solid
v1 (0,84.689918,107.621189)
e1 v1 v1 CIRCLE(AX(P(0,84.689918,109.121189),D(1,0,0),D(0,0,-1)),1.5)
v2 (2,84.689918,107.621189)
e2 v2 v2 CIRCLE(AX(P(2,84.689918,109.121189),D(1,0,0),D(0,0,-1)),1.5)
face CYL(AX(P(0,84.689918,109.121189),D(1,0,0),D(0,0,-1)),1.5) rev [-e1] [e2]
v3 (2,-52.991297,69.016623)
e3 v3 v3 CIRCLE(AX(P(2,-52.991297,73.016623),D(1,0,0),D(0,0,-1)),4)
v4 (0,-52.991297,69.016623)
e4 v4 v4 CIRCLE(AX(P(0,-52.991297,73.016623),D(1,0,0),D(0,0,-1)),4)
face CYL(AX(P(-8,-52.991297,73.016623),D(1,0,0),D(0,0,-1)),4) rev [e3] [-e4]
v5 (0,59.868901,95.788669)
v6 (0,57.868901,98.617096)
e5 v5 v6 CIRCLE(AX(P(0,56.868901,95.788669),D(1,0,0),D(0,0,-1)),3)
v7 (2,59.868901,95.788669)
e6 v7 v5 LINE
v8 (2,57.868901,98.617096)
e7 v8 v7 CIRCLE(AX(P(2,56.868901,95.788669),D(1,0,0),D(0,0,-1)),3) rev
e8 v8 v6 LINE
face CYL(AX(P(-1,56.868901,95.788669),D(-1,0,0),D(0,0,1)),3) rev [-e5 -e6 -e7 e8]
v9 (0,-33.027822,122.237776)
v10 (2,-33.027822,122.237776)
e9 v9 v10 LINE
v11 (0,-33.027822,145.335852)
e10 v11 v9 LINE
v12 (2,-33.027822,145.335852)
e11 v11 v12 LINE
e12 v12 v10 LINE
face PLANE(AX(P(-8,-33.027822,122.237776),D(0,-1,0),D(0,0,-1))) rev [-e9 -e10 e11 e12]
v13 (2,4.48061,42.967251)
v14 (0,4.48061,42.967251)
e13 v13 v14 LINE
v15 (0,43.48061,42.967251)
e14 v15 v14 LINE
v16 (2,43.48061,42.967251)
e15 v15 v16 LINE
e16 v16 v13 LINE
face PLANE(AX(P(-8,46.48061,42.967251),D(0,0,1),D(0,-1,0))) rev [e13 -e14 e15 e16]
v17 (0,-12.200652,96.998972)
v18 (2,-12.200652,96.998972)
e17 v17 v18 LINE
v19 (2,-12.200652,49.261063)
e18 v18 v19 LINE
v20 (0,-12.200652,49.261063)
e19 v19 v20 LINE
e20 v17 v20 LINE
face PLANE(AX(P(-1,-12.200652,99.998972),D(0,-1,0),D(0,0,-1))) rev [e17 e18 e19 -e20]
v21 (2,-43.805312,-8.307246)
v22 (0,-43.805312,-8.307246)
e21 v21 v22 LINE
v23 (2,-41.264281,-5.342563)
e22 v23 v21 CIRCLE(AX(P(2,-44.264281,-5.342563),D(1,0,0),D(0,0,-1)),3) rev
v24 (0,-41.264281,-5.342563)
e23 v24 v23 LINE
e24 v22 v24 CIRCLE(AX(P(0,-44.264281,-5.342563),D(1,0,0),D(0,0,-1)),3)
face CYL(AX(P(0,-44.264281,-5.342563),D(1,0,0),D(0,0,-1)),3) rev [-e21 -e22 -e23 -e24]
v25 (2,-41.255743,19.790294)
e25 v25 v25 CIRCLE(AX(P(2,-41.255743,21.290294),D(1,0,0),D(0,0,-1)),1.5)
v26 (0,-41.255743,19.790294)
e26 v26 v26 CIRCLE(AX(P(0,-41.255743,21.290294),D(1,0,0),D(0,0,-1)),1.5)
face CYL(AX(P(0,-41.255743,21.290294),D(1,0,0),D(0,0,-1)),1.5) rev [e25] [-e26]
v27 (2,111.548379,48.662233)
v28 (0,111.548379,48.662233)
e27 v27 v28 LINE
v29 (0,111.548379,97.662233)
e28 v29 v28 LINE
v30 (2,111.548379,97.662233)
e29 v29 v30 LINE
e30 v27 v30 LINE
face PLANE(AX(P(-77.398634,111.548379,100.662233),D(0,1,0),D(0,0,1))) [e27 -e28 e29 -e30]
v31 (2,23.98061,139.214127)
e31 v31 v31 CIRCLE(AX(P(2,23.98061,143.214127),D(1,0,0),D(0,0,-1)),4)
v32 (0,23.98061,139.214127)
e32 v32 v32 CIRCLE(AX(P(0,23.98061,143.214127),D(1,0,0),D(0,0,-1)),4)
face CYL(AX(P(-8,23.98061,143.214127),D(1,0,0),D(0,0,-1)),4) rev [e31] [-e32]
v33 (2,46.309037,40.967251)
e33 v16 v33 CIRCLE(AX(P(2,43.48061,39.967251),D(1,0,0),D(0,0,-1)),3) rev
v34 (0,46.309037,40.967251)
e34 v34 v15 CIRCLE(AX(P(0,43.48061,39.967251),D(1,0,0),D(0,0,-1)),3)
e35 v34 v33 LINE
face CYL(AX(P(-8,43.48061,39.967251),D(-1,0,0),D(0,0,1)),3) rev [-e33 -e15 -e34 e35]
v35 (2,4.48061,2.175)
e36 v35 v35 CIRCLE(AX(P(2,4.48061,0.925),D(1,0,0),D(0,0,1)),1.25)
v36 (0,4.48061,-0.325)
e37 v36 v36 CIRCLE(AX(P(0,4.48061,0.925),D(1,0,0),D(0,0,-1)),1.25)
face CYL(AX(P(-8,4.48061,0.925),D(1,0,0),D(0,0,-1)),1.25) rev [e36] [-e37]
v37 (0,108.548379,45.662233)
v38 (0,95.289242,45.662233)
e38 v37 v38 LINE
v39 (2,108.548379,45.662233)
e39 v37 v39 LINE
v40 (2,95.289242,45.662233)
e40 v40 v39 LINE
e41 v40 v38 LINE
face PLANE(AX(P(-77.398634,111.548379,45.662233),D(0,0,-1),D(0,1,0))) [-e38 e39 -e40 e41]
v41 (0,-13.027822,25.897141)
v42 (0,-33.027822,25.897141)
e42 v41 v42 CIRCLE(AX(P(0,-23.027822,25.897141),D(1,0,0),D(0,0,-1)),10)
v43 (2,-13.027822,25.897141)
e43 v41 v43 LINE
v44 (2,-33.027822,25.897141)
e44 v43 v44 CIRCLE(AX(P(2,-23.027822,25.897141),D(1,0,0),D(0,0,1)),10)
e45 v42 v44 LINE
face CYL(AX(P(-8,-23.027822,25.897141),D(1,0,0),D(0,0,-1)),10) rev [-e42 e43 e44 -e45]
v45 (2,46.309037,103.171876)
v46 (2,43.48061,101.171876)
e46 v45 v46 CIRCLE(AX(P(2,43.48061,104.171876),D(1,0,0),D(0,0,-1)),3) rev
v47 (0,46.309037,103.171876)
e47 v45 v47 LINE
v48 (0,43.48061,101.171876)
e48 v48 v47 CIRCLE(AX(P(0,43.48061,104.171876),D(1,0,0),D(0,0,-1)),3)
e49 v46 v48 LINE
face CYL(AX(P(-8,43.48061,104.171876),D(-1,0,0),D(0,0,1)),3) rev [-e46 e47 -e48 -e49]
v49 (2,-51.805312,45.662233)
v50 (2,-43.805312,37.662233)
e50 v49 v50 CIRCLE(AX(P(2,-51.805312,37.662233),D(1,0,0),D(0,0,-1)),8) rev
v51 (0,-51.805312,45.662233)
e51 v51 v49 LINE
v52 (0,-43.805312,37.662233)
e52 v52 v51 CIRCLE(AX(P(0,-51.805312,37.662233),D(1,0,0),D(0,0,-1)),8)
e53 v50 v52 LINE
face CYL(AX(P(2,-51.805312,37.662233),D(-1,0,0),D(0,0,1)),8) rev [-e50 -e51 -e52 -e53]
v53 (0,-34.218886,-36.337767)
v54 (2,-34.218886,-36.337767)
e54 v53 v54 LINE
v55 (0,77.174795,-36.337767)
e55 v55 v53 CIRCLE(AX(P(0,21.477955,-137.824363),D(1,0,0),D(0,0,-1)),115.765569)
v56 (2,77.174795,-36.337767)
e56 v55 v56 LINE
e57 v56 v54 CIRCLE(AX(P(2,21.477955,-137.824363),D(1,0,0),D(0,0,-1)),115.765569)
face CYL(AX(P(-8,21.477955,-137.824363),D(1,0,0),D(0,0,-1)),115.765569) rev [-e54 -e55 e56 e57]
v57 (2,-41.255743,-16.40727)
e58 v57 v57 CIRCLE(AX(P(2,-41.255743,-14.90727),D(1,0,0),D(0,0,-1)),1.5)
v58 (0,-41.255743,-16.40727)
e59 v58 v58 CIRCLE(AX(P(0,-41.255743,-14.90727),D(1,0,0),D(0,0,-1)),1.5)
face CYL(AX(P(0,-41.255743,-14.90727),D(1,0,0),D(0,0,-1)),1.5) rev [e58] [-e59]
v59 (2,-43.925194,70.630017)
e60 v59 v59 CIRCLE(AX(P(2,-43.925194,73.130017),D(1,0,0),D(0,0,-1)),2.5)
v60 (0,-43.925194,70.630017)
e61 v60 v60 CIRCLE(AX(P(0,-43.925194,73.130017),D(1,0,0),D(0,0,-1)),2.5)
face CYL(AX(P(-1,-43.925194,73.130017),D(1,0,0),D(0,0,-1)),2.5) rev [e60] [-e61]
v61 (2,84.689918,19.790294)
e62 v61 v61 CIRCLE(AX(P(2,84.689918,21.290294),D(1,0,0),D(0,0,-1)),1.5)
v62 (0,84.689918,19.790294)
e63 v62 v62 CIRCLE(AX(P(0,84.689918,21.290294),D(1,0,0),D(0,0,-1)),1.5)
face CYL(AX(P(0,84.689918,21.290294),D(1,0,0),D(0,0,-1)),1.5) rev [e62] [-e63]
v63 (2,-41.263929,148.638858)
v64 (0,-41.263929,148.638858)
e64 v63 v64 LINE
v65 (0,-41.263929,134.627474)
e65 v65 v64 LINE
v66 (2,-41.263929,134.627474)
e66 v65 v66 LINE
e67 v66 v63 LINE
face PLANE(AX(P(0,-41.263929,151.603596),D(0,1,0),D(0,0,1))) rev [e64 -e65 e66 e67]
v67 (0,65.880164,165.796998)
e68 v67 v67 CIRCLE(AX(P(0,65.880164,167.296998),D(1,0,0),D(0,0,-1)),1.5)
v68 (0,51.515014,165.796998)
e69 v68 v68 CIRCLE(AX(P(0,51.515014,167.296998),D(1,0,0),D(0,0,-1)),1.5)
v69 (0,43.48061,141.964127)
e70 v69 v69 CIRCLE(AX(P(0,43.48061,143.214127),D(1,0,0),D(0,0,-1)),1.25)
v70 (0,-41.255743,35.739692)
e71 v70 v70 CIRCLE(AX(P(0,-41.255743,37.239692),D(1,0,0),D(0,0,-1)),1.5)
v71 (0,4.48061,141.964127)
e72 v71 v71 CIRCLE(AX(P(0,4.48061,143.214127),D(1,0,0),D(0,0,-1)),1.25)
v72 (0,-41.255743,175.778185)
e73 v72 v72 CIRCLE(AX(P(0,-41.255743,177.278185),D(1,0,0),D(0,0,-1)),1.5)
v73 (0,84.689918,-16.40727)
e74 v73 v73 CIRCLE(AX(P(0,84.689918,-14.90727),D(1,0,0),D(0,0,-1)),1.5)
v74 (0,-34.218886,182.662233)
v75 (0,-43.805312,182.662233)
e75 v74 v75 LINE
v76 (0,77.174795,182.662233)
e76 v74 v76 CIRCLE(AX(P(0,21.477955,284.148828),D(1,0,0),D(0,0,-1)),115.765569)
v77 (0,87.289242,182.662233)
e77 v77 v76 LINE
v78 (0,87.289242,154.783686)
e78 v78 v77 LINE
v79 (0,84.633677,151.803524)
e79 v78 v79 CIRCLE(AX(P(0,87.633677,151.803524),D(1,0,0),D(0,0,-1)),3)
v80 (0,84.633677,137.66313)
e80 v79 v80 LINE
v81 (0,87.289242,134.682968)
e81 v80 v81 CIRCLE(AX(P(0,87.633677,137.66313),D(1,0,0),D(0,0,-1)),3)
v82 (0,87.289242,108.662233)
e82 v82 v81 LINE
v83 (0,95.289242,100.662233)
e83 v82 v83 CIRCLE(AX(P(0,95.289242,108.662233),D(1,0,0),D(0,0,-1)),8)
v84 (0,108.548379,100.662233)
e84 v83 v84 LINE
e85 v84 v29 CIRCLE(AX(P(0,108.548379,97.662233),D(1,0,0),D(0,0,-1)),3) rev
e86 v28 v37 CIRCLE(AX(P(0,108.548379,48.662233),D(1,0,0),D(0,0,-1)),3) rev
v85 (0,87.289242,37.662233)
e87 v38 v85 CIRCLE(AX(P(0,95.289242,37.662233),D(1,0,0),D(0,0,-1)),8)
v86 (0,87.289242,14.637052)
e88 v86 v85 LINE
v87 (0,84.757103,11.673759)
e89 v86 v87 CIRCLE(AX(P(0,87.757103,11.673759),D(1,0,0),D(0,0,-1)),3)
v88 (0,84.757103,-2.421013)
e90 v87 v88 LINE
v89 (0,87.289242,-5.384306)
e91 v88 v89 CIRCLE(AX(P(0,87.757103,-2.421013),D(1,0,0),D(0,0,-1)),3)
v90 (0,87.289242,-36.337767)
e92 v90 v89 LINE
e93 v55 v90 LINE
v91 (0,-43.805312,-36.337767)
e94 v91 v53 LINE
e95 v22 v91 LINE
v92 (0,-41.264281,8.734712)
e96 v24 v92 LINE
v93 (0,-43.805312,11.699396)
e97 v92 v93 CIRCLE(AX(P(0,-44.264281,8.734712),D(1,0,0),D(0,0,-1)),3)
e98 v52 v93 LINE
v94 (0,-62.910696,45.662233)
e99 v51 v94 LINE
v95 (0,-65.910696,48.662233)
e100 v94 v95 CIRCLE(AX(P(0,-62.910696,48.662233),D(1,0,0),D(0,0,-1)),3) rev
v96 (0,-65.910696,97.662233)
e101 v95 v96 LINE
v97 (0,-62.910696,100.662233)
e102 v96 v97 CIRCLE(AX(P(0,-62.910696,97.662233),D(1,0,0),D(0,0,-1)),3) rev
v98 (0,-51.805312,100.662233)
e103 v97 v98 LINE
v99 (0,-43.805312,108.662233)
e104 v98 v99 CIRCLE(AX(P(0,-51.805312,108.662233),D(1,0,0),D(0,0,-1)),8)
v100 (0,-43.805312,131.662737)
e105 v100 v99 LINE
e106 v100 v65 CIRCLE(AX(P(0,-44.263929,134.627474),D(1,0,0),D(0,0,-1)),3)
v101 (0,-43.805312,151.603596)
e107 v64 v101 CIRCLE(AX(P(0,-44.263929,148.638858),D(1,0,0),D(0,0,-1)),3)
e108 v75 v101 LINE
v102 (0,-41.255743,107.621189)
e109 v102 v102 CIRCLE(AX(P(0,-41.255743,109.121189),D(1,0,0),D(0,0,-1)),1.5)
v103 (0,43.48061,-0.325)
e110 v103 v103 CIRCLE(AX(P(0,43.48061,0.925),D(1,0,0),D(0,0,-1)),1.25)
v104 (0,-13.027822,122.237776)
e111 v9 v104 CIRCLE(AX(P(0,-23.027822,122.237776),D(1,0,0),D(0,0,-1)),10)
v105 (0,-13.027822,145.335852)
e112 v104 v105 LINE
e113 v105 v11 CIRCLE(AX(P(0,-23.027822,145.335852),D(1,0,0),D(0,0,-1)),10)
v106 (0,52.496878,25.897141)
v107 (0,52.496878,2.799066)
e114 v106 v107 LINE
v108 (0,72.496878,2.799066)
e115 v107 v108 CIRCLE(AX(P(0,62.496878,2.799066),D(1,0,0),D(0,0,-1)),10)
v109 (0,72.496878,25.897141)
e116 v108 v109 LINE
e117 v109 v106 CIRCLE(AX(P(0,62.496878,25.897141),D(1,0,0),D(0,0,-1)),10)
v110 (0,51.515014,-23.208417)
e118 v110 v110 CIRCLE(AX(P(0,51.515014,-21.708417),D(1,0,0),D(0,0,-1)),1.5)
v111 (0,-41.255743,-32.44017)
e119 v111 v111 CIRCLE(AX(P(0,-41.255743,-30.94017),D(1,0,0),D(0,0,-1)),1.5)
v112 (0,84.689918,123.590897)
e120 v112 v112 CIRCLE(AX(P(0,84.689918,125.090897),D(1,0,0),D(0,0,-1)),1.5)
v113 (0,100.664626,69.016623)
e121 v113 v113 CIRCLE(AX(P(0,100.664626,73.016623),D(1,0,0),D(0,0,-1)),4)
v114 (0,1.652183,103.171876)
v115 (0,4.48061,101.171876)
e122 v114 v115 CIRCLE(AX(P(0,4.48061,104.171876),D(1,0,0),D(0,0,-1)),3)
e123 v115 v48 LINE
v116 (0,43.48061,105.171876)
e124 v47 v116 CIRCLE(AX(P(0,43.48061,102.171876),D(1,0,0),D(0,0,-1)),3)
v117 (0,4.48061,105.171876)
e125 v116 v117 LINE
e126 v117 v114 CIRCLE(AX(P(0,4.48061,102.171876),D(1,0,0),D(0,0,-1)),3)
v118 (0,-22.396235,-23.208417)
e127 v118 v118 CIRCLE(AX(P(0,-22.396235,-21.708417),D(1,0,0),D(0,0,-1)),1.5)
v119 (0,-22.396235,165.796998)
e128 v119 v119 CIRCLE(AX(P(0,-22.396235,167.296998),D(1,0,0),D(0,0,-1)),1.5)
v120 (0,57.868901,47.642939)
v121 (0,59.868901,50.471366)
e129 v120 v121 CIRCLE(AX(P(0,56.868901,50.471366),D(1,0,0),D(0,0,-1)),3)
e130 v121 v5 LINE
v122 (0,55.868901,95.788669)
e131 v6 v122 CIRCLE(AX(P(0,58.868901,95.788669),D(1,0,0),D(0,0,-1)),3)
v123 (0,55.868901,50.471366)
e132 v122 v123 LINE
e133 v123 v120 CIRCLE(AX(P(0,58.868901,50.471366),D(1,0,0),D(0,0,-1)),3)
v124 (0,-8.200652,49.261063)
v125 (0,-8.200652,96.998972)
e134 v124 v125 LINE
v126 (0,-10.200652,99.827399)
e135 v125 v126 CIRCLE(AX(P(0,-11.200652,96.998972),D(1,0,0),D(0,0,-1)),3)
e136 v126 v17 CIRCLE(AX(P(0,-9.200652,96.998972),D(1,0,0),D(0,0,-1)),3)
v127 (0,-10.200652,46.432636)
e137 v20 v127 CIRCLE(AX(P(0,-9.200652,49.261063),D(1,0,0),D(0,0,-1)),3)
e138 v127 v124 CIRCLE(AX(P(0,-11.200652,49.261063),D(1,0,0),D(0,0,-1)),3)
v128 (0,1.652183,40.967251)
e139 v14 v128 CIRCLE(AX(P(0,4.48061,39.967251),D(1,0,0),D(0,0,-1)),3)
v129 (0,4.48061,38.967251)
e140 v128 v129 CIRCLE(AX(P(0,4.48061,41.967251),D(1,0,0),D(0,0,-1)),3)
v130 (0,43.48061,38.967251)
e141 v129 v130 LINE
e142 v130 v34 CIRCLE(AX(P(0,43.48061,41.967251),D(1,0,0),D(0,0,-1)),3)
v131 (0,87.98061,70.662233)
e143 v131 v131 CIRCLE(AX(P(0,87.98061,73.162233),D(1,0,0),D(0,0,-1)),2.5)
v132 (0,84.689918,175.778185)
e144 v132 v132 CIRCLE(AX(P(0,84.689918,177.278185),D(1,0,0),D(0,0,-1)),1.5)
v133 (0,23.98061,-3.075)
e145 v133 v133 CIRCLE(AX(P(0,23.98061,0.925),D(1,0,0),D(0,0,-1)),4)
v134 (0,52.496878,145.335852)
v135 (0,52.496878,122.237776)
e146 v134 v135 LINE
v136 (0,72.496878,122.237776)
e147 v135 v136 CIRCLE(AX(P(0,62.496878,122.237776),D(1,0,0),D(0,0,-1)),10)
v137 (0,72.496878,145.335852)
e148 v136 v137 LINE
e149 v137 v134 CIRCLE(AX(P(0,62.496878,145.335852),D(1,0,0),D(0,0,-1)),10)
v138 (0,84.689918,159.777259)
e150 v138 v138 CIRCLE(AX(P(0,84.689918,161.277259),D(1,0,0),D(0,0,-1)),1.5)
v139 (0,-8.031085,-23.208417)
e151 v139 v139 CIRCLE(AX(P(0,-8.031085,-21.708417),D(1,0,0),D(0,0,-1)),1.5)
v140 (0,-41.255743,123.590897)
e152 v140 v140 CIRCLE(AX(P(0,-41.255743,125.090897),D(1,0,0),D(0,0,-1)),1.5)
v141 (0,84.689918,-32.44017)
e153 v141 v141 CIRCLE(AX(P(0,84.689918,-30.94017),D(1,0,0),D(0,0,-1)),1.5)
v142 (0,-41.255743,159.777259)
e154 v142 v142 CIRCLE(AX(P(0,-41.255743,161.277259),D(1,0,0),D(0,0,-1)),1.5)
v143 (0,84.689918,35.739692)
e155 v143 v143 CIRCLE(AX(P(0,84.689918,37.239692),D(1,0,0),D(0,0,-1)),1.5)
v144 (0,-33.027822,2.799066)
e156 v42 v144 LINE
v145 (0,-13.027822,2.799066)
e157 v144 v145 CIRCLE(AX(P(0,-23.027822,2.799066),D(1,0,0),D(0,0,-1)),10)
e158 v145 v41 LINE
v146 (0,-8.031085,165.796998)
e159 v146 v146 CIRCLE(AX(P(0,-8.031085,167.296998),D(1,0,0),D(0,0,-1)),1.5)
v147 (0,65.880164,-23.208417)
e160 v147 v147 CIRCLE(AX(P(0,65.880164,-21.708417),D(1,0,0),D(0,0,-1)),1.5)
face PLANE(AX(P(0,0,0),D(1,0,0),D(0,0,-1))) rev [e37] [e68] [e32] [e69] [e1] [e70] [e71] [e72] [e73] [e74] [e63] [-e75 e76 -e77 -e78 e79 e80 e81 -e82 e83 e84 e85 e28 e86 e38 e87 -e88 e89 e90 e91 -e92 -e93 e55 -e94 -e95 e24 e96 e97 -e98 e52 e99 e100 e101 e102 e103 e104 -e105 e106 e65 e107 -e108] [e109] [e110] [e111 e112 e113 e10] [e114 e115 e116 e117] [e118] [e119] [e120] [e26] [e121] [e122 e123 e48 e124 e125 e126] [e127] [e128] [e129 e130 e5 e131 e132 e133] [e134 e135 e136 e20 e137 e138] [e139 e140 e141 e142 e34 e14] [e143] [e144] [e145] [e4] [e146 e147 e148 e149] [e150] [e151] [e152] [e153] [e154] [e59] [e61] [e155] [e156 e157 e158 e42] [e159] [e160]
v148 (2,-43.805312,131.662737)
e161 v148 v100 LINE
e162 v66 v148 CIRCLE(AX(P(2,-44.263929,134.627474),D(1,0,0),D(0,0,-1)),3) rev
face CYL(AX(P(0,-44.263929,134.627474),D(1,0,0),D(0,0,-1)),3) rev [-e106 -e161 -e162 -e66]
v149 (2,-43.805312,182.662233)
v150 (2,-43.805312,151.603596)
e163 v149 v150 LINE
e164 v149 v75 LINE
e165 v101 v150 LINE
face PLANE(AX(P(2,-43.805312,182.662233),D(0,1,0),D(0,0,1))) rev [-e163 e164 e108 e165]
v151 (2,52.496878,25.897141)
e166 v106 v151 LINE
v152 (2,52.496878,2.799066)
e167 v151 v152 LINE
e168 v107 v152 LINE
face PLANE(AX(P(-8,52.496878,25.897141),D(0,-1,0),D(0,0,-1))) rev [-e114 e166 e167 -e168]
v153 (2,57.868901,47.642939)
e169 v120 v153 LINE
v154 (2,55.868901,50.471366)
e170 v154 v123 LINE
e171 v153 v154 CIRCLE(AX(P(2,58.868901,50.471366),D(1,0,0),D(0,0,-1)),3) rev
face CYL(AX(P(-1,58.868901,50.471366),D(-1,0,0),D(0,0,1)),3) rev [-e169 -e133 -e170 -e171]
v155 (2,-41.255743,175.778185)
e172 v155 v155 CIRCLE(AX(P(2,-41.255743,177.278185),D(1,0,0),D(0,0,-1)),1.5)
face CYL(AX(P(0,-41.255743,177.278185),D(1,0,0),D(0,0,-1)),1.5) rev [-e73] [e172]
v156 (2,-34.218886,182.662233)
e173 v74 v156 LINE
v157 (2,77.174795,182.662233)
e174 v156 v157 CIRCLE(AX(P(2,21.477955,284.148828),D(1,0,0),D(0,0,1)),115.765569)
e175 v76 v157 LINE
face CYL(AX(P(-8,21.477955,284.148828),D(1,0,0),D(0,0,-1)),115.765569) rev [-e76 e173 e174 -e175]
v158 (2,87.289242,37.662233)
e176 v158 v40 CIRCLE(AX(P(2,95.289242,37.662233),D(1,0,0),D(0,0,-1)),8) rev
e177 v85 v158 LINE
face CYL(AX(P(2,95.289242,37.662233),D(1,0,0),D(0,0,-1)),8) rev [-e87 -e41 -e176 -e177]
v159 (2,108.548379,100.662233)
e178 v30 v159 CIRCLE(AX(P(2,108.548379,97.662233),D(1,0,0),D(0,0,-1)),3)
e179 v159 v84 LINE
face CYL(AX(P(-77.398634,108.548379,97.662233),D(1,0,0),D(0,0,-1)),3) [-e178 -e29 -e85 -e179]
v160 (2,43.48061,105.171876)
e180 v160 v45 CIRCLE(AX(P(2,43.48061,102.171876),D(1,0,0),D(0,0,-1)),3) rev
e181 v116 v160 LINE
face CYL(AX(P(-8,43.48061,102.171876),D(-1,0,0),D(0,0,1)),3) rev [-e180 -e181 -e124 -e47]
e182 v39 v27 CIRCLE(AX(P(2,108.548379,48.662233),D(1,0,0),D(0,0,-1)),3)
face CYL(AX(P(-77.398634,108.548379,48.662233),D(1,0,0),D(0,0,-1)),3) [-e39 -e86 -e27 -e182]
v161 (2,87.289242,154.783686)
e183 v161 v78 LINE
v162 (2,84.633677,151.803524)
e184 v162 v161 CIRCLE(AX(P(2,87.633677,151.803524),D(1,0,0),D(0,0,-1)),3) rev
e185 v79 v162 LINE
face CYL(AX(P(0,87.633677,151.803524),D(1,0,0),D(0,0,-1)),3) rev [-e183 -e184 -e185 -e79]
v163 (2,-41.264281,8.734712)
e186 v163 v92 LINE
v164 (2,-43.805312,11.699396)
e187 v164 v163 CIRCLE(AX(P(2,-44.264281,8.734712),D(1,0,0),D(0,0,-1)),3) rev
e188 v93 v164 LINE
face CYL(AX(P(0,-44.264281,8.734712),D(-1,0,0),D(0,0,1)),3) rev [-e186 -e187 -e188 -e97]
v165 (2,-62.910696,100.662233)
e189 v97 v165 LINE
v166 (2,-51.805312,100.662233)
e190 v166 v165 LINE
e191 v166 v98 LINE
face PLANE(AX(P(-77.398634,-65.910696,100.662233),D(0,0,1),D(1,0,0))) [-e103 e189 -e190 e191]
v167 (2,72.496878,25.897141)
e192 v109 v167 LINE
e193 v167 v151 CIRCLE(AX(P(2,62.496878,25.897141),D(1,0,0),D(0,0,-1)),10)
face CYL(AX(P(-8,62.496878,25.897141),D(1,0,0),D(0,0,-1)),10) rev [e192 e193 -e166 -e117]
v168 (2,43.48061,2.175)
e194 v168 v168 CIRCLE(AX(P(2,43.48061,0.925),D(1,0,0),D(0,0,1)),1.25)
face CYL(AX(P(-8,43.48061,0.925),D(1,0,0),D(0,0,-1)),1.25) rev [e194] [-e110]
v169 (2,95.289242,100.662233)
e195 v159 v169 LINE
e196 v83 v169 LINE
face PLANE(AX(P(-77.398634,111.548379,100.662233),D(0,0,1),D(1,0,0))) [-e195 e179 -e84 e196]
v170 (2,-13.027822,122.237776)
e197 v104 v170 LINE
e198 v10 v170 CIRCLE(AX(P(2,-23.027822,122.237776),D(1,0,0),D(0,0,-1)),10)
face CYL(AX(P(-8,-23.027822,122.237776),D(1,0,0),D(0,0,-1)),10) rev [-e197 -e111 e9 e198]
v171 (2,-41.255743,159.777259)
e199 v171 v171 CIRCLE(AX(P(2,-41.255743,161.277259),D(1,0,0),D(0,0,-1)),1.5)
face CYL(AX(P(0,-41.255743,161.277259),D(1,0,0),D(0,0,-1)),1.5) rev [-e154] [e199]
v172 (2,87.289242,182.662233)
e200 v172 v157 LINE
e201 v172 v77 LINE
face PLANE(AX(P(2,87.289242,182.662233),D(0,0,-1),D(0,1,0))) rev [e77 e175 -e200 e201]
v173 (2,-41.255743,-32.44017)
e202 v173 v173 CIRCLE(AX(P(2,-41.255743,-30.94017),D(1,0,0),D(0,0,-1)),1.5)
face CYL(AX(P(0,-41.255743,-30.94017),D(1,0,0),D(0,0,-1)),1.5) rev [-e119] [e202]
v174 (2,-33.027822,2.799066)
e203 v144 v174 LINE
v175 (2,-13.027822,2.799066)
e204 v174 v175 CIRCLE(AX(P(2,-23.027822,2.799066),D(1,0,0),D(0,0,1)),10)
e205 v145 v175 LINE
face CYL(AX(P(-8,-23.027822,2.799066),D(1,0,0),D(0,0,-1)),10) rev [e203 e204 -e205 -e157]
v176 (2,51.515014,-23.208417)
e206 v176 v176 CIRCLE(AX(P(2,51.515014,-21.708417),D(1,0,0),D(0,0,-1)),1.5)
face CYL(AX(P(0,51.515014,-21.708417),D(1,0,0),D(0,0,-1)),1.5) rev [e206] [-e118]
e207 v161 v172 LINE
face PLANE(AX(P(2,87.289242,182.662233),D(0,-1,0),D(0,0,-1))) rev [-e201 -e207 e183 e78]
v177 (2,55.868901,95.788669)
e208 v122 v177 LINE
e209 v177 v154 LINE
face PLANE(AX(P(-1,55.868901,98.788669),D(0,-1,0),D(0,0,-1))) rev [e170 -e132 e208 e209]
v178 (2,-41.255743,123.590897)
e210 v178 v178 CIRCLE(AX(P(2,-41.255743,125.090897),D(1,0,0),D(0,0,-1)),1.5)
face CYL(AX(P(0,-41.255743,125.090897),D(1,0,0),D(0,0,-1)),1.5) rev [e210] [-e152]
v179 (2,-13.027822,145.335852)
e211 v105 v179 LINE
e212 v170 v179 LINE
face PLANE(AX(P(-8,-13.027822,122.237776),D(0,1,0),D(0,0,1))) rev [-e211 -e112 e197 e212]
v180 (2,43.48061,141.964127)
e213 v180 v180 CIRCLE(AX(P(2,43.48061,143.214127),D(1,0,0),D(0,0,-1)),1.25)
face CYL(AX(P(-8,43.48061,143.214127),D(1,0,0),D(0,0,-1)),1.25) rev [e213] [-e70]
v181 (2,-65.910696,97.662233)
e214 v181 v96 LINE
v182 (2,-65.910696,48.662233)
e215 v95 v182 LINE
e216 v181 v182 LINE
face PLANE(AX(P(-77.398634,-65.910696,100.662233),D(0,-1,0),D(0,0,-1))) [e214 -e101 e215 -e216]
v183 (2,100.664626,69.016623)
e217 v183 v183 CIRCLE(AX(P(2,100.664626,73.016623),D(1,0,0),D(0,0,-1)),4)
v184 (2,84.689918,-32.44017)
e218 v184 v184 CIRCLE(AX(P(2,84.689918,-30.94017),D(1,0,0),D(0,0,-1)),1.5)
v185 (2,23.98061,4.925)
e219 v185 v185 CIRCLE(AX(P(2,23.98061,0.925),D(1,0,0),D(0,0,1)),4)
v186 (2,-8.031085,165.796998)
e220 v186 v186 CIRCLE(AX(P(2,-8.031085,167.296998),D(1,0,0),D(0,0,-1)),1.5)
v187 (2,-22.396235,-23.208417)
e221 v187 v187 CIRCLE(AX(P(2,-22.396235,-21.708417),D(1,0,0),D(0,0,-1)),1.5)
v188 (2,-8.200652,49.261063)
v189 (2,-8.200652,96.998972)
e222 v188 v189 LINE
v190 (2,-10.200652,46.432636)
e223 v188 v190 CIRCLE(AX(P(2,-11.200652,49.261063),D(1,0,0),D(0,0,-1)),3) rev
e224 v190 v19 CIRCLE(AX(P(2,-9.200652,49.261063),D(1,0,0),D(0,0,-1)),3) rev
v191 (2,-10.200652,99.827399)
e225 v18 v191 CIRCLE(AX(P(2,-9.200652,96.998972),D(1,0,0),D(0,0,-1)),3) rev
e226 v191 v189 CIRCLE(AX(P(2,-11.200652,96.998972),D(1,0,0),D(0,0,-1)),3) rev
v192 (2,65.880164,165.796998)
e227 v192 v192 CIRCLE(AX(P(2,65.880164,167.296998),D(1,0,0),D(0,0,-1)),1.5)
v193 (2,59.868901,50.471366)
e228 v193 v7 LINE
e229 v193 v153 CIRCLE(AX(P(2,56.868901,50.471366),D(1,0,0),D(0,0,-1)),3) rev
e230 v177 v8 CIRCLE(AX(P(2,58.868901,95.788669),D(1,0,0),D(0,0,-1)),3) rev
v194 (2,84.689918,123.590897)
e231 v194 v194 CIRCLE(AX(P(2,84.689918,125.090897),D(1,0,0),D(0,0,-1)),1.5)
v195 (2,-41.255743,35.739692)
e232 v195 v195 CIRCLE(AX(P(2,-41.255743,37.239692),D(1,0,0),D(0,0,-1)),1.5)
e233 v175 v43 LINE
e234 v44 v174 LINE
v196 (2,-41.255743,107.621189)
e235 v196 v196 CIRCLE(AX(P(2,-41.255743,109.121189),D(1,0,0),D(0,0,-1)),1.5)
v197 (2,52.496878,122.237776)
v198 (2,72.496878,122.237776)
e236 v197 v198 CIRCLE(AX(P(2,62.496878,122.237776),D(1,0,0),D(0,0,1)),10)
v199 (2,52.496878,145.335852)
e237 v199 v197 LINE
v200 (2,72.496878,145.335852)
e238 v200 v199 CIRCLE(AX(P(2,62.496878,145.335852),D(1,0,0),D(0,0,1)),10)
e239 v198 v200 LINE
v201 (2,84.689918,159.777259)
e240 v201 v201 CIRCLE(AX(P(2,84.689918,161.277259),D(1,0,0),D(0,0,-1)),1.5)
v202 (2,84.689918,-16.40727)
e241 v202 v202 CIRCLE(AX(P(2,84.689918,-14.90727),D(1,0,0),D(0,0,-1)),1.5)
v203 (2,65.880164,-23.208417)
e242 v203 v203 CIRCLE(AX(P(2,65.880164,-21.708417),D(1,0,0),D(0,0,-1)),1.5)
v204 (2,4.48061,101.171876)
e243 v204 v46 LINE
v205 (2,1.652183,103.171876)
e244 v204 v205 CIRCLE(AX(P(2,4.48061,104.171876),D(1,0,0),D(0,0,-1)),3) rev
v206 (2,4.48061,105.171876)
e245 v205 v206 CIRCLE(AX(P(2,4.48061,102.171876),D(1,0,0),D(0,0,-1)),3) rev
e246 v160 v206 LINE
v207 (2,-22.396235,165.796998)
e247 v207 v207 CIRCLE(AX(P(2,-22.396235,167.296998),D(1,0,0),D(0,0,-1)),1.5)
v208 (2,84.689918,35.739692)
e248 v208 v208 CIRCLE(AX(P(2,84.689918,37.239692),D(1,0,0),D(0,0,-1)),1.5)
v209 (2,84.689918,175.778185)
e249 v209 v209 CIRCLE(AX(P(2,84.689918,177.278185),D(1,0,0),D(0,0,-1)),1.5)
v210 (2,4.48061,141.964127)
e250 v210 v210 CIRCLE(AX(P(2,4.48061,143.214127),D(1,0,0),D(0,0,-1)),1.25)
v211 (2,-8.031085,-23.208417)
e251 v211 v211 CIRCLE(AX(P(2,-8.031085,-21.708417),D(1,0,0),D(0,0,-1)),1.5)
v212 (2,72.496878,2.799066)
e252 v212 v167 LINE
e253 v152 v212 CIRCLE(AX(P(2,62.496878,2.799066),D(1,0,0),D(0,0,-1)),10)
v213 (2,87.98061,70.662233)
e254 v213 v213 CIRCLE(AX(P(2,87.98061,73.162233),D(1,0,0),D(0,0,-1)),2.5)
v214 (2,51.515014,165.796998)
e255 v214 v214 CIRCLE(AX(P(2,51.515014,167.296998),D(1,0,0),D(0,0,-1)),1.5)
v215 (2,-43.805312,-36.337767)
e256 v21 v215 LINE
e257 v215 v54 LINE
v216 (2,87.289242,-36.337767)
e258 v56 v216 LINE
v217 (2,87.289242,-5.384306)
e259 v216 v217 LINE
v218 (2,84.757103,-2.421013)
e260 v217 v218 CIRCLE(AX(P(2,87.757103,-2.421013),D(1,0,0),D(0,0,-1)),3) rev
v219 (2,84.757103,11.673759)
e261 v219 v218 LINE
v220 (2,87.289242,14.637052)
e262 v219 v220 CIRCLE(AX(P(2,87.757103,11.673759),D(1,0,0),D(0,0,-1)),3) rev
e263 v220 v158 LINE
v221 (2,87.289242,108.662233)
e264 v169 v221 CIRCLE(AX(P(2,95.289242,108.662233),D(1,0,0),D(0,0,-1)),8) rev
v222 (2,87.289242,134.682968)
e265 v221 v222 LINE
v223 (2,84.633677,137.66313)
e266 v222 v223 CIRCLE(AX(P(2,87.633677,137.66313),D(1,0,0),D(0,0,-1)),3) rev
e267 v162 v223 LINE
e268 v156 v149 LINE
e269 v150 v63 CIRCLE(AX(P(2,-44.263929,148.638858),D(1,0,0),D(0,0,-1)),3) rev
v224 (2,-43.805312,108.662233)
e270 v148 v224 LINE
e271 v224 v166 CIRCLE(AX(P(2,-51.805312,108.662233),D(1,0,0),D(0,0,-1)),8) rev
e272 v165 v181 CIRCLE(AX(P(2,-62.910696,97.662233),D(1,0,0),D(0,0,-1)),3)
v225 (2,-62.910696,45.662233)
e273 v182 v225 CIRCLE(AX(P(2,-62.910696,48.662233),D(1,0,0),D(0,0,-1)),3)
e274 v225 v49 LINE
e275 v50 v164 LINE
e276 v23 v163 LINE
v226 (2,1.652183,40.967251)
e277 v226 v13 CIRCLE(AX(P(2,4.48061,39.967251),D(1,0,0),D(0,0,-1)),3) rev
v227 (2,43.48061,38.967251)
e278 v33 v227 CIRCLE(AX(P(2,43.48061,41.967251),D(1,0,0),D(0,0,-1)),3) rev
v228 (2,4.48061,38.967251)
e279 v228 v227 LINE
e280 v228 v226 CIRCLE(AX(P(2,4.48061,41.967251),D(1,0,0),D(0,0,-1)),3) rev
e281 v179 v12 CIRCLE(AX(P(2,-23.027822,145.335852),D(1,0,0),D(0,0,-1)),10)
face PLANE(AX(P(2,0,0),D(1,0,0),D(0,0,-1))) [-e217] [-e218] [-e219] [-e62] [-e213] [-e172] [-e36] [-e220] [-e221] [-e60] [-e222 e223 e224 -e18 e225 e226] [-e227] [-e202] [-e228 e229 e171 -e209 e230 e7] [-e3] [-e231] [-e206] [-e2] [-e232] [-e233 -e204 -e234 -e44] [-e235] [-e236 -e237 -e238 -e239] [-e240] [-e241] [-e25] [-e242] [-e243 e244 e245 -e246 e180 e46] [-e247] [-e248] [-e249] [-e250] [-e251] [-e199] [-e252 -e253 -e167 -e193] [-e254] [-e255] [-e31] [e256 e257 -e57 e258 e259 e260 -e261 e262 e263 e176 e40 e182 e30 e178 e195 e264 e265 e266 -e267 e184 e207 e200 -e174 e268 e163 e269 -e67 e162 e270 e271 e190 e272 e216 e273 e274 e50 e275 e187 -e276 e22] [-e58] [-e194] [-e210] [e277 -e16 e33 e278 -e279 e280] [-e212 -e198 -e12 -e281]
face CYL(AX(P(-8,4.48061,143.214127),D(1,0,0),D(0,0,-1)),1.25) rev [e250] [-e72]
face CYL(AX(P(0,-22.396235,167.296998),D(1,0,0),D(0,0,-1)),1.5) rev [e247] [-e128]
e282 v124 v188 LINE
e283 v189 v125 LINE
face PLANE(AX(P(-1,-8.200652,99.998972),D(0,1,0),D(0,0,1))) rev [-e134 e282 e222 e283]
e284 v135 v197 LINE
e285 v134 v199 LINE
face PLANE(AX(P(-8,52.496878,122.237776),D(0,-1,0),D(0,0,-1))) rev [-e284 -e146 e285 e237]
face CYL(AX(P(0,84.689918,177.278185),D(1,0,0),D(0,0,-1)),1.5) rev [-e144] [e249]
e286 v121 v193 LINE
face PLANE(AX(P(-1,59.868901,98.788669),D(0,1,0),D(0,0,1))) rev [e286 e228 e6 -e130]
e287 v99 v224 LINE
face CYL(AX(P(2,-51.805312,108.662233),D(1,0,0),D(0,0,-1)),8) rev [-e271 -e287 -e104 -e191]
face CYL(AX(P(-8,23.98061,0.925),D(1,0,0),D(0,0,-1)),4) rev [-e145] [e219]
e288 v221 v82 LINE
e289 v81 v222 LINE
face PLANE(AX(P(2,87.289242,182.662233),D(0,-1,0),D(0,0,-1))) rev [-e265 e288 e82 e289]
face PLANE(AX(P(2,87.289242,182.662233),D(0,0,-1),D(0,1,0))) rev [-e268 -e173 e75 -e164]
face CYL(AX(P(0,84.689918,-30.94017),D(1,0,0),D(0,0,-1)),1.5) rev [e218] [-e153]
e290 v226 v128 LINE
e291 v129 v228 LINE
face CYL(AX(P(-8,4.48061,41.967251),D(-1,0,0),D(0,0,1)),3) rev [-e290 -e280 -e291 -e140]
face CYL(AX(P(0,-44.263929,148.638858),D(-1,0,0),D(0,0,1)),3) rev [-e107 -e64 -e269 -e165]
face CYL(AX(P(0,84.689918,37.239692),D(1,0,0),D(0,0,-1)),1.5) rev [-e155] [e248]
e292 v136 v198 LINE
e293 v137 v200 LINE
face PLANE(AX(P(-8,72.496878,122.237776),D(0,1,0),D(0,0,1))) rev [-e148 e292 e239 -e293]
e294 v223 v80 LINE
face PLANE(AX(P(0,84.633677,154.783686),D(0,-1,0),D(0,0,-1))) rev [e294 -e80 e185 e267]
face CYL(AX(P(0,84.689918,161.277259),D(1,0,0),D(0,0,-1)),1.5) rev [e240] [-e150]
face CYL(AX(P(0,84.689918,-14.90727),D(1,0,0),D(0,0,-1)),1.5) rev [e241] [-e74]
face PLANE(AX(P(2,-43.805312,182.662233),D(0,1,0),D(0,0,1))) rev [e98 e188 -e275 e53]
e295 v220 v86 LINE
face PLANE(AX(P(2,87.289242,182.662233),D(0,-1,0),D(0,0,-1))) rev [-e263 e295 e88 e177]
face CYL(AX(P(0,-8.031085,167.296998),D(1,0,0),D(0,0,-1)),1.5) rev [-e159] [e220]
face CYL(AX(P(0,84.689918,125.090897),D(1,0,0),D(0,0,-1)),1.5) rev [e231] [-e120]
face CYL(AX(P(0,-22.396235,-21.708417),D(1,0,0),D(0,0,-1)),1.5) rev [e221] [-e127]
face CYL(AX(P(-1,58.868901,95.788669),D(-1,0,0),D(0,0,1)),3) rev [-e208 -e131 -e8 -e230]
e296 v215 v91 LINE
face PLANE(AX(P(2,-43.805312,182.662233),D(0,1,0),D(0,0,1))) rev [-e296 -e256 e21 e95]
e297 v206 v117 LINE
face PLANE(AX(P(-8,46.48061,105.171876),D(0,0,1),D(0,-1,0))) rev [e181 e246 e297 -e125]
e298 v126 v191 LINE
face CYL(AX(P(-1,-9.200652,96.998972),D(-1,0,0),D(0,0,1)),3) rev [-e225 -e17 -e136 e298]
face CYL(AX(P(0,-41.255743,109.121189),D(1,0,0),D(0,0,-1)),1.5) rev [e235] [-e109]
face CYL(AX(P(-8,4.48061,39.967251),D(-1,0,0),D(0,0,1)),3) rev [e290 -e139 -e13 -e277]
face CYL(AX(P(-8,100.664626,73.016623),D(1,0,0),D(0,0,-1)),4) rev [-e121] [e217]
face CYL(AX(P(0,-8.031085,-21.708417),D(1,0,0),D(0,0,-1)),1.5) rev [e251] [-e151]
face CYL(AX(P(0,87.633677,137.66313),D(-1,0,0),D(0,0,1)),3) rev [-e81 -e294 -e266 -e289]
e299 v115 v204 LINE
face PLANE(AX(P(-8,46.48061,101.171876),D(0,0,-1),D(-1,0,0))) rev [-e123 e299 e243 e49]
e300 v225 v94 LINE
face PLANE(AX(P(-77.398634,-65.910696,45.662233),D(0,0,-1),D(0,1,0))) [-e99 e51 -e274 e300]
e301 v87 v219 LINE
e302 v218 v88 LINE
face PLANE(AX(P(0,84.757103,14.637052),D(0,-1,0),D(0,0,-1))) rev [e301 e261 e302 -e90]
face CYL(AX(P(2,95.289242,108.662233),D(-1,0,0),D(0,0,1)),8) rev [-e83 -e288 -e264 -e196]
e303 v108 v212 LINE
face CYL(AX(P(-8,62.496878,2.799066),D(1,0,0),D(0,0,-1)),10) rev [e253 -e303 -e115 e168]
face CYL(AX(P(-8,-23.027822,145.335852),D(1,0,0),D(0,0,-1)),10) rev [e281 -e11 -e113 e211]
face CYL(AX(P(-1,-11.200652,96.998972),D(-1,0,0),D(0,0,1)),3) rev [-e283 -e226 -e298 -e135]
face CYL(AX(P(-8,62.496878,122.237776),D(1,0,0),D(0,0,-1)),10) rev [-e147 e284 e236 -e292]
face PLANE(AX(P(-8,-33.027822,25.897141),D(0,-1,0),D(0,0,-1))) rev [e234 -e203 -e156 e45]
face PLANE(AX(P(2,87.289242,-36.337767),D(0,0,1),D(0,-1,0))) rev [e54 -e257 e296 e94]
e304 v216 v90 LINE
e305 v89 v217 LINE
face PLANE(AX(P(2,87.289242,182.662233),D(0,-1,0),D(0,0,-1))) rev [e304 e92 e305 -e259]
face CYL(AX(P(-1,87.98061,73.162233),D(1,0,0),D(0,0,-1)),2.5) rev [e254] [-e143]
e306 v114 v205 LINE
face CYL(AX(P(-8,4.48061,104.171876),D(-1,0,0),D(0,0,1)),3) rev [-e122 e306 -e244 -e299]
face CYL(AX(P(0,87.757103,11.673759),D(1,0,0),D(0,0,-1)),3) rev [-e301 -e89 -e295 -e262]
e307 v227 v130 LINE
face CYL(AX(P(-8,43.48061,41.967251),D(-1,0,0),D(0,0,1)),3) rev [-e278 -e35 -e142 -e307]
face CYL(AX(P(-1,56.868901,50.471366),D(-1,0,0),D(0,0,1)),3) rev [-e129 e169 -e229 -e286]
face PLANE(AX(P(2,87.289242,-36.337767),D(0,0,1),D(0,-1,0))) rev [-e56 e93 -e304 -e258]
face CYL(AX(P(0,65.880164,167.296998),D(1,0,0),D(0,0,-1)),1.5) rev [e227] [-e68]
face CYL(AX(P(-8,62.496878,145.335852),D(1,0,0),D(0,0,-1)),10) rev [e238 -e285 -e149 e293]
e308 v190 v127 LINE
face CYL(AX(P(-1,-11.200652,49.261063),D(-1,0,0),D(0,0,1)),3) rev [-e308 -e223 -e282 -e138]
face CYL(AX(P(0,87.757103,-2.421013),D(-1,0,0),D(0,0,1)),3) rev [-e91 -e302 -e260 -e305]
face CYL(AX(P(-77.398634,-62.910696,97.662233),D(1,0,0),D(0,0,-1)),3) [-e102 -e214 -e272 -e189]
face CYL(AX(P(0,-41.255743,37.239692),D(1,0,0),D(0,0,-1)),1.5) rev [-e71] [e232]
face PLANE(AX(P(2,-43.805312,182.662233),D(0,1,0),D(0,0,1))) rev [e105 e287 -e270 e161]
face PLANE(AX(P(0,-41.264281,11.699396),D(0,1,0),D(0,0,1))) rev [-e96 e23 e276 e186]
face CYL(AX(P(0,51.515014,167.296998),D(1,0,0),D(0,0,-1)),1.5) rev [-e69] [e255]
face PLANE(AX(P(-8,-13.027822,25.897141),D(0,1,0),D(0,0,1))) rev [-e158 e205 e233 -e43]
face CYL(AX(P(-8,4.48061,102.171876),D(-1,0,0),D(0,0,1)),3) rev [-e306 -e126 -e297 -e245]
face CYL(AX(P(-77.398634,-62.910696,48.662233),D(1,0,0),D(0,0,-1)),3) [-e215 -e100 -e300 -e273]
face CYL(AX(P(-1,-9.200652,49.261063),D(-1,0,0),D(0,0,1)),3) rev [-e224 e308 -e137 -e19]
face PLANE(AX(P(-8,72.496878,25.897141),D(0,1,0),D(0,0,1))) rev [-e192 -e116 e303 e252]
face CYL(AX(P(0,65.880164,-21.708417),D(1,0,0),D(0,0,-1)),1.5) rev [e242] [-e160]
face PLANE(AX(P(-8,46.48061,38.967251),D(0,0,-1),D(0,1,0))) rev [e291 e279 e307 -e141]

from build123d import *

# Parameters (mm, degrees)
SKETCH1_W           = 219
SKETCH1_H           = 131.094554082
BOSS_EXTRUDE1_DEPTH = 2
SKETCH2_R           = 1.5
CUT_EXTRUDE1_DEPTH  = 2
SKETCH3_W           = 20.100718227
SKETCH3_H           = 5.311130235
SKETCH3_W_2         = 20.021358258
SKETCH3_H_2         = 5.064277487
SKETCH3_W_3         = 19.940859064
SKETCH3_H_3         = 5.08276585
SKETCH3_W_4         = 20.006641617
SKETCH3_H_4         = 5.082063379
CUT_EXTRUDE2_DEPTH  = 2
FILLET1_R           = 3
SKETCH4_R           = 1.5
CUT_EXTRUDE3_DEPTH  = 2
SKETCH5_R           = 1.25
SKETCH5_R_2         = 4
SKETCH5_W           = 4
SKETCH5_H           = 45
CUT_EXTRUDE4_DEPTH  = 10
SKETCH6_W           = 55
SKETCH6_H           = 54.456850543
BOSS_EXTRUDE2_DEPTH = 2
FILLET2_R           = 8
FILLET3_R           = 3
SKETCH7_R           = 4
CUT_EXTRUDE5_DEPTH  = 10
SKETCH8_R           = 2.5
SKETCH8_W           = 51.317302969
SKETCH8_H           = 4
SKETCH8_W_2         = 53.737908292
CUT_EXTRUDE6_DEPTH  = 3
FILLET4_R           = 3


with BuildPart() as part:
    # Sketch1 → Boss-Extrude1 (new body)
    with BuildSketch(Plane(origin=(0, 0, 0), x_dir=(0, 0, -1), z_dir=(1, 0, 0))):
        with Locations((-73.162232803, 21.741964745)):
            Rectangle(SKETCH1_W, SKETCH1_H)
    extrude(amount=BOSS_EXTRUDE1_DEPTH)

    # Sketch2 → Cut-Extrude1 (cut)
    with BuildSketch(Plane(origin=(2, 0, 0), x_dir=(0, 0, -1), z_dir=(1, 0, 0))):
        with Locations((-177.27818527, 84.689917601)):
            Circle(SKETCH2_R)
        with Locations((-161.277258525, 84.689917601)):
            Circle(SKETCH2_R)
        with Locations((14.907270265, 84.689917601)):
            Circle(SKETCH2_R)
        with Locations((30.940170054, 84.689917601)):
            Circle(SKETCH2_R)
        with Locations((-125.090896887, 84.689917601)):
            Circle(SKETCH2_R)
        with Locations((-109.121189232, 84.689917601)):
            Circle(SKETCH2_R)
        with Locations((-37.23969182, 84.689917601)):
            Circle(SKETCH2_R)
        with Locations((-21.290294086, 84.689917601)):
            Circle(SKETCH2_R)
        with Locations((-177.27818527, -41.255743067)):
            Circle(SKETCH2_R)
        with Locations((-161.277258525, -41.255743067)):
            Circle(SKETCH2_R)
        with Locations((-125.090896887, -41.255743067)):
            Circle(SKETCH2_R)
        with Locations((-109.121189232, -41.255743067)):
            Circle(SKETCH2_R)
        with Locations((-21.290294086, -41.255743067)):
            Circle(SKETCH2_R)
        with Locations((-37.23969182, -41.255743067)):
            Circle(SKETCH2_R)
        with Locations((14.907270265, -41.255743067)):
            Circle(SKETCH2_R)
        with Locations((30.940170054, -41.255743067)):
            Circle(SKETCH2_R)
    extrude(amount=-CUT_EXTRUDE1_DEPTH, mode=Mode.SUBTRACT)

    # Sketch3 → Cut-Extrude2 (cut)
    with BuildSketch(Plane(origin=(2, 0, 0), x_dir=(0, 0, -1), z_dir=(1, 0, 0))):
        with Locations((-144.733326963, 87.289241785)):
            Rectangle(SKETCH3_W, SKETCH3_H)
        with Locations((-4.626373242, 87.289241786)):
            Rectangle(SKETCH3_W_2, SKETCH3_H_2)
        with Locations((-141.63316605, -43.805312296)):
            Rectangle(SKETCH3_W_3, SKETCH3_H_3)
        with Locations((-1.696074774, -43.805312296)):
            Rectangle(SKETCH3_W_4, SKETCH3_H_4)
    extrude(amount=-CUT_EXTRUDE2_DEPTH, mode=Mode.SUBTRACT)

    # Fillet1
    # the kernel refuses this fillet: 3 mm, written as the material it adds along each edge
    with BuildSketch(Plane(origin=(2, 84.633676668, 154.783686076), x_dir=(0, 1, 0), z_dir=(-1, 0, 0))) as fillet1_piece_1:
        with BuildLine():
            CenterArc((3, 2.980161843), FILLET1_R, 180, 83.407239863)
            Line((0, 2.980161843), (-0.06, 2.980161843))
            Line((-0.06, 2.980161843), (-0.06, 0))
            Line((-0.06, 0), (0, -0.06))
            ThreePointArc((0, -0.06), (1.327782559, -0.06), (2.64867642, -0.059603237))
            Line((2.64867642, -0.059603237), (2.655565117, 0))
        make_face()
    extrude(amount=2)
    with BuildSketch(Plane(origin=(2, 84.633676668, 134.682967849), x_dir=(0, 1, 0), z_dir=(-1, 0, 0))) as fillet1_piece_2:
        with BuildLine():
            CenterArc((3, -2.980161843), FILLET1_R, 96.592760137, 83.407239863)
            Line((0, -2.980161843), (-0.06, -2.980161843))
            Line((-0.06, -2.980161843), (-0.06, 0))
            Line((-0.06, 0), (0, 0.06))
            ThreePointArc((0, 0.06), (1.327782559, 0.06), (2.64867642, 0.059603237))
            Line((2.64867642, 0.059603237), (2.655565117, 0))
        make_face()
    extrude(amount=2)
    with BuildSketch(Plane(origin=(2, 84.757103042, -5.384305887), x_dir=(0, 1, 0), z_dir=(-1, 0, 0))) as fillet1_piece_3:
        with BuildLine():
            CenterArc((3, -2.963293074), FILLET1_R, 98.972114931, 81.027885069)
            Line((0, -2.963293074), (-0.06, -2.963293074))
            Line((-0.06, -2.963293074), (-0.06, 0))
            Line((-0.06, 0), (0, 0.06))
            ThreePointArc((0, 0.06), (1.266069372, 0.06), (2.522781518, 0.059265861))
            Line((2.522781518, 0.059265861), (2.532138743, 0))
        make_face()
    extrude(amount=2)
    with BuildSketch(Plane(origin=(2, 84.757103042, 14.637052371), x_dir=(0, 0, -1), z_dir=(-1, 0, 0))) as fillet1_piece_4:
        with BuildLine():
            CenterArc((2.963293074, -3), FILLET1_R, 90, 81.027885069)
            Line((0, -2.532138743), (-0.059265861, -2.522781518))
            ThreePointArc((-0.059265861, -2.522781518), (-0.06, -1.266069372), (-0.06, 0))
            Line((-0.06, 0), (0, 0.06))
            Line((0, 0.06), (2.963293074, 0.06))
            Line((2.963293074, 0.06), (2.963293074, 0))
        make_face()
    extrude(amount=2)
    with BuildSketch(Plane(origin=(2, -41.264280606, 11.699395582), x_dir=(0, -1, 0), z_dir=(-1, 0, 0))) as fillet1_piece_5:
        with BuildLine():
            CenterArc((3, -2.964683472), FILLET1_R, 98.800208751, 81.199791249)
            Line((0, -2.964683472), (-0.06, -2.964683472))
            Line((-0.06, -2.964683472), (-0.06, 0))
            Line((-0.06, 0), (0, 0.06))
            ThreePointArc((0, 0.06), (1.270515845, 0.06), (2.531852323, 0.059293669))
            Line((2.531852323, 0.059293669), (2.54103169, 0))
        make_face()
    extrude(amount=2)
    with BuildSketch(Plane(origin=(2, -41.264280606, -8.307246035), x_dir=(0, 0, 1), z_dir=(-1, 0, 0))) as fillet1_piece_6:
        with BuildLine():
            CenterArc((2.964683472, -3), FILLET1_R, 90, 81.199791249)
            Line((0, -2.54103169), (-0.059293669, -2.531852323))
            ThreePointArc((-0.059293669, -2.531852323), (-0.06, -1.270515845), (-0.06, 0))
            Line((-0.06, 0), (0, 0.06))
            Line((0, 0.06), (2.964683472, 0.06))
            Line((2.964683472, 0.06), (2.964683472, 0))
        make_face()
    extrude(amount=2)
    with BuildSketch(Plane(origin=(2, -41.263929371, 131.662736518), x_dir=(0, 0, 1), z_dir=(-1, 0, 0))) as fillet1_piece_7:
        with BuildLine():
            CenterArc((2.964737826, -3), FILLET1_R, 90, 81.206579194)
            Line((0, -2.541382925), (-0.059294757, -2.532210583))
            ThreePointArc((-0.059294757, -2.532210583), (-0.06, -1.270691462), (-0.06, 0))
            Line((-0.06, 0), (0, 0.06))
            Line((0, 0.06), (2.964737826, 0.06))
            Line((2.964737826, 0.06), (2.964737826, 0))
        make_face()
    extrude(amount=2)
    with BuildSketch(Plane(origin=(2, -41.263929371, 151.603595582), x_dir=(0, -1, 0), z_dir=(-1, 0, 0))) as fillet1_piece_8:
        with BuildLine():
            CenterArc((3, -2.964737826), FILLET1_R, 98.793420806, 81.206579194)
            Line((0, -2.964737826), (-0.06, -2.964737826))
            Line((-0.06, -2.964737826), (-0.06, 0))
            Line((-0.06, 0), (0, 0.06))
            ThreePointArc((0, 0.06), (1.270691462, 0.06), (2.532210583, 0.059294757))
            Line((2.532210583, 0.059294757), (2.541382925, 0))
        make_face()
    extrude(amount=2)

    # Sketch4 → Cut-Extrude3 (cut)
    with BuildSketch(Plane(origin=(2, 0, 0), x_dir=(0, 0, -1), z_dir=(1, 0, 0))):
        with Locations((-167.296997749, 65.880164244)):
            Circle(SKETCH4_R)
        with Locations((-167.296997749, 51.515014112)):
            Circle(SKETCH4_R)
        with Locations((-167.296997749, -8.031084623)):
            Circle(SKETCH4_R)
        with Locations((-167.296997749, -22.396234754)):
            Circle(SKETCH4_R)
        with Locations((21.708416743, 65.880164244)):
            Circle(SKETCH4_R)
        with Locations((21.708416743, 51.515014112)):
            Circle(SKETCH4_R)
        with Locations((21.708416743, -8.031084623)):
            Circle(SKETCH4_R)
        with Locations((21.708416743, -22.396234754)):
            Circle(SKETCH4_R)
    extrude(amount=-CUT_EXTRUDE3_DEPTH, mode=Mode.SUBTRACT)

    # Sketch5 → Cut-Extrude4 (cut)
    with BuildSketch(Plane(origin=(2, 0, 0), x_dir=(0, 0, -1), z_dir=(1, 0, 0))):
        with Locations((-143.214126684, 43.480610114)):
            Circle(SKETCH5_R)
        with Locations((-143.214126684, 4.480610114)):
            Circle(SKETCH5_R)
        with Locations((-143.214126684, 23.980610114)):
            Circle(SKETCH5_R_2)
        with Locations((-0.925000289, 23.980610114)):
            Circle(SKETCH5_R_2)
        with Locations((-0.925000289, 4.480610114)):
            Circle(SKETCH5_R)
        with Locations((-0.925000289, 43.480610114)):
            Circle(SKETCH5_R)
        with BuildLine():
            Line((-182.662232803, 77.174795439), (-182.662232803, -34.218885505))
            ThreePointArc((-182.662232803, -34.218885505), (-168.383258688, 21.477954967), (-182.662232803, 77.174795439))
        make_face()
        with BuildLine():
            Line((36.337767197, 77.174795439), (36.337767197, -34.218885505))
            ThreePointArc((36.337767197, -34.218885505), (22.058793083, 21.477954967), (36.337767197, 77.174795439))
        make_face()
        with BuildLine():
            Line((-25.897141257, 72.496877719), (-2.799065676, 72.496877719))
            ThreePointArc((-2.799065676, 72.496877719), (7.200934324, 62.496877719), (-2.799065676, 52.496877719))
            Line((-2.799065676, 52.496877719), (-25.897141257, 52.496877719))
            ThreePointArc((-25.897141257, 52.496877719), (-35.897141257, 62.496877719), (-25.897141257, 72.496877719))
        make_face()
        with BuildLine():
            Line((-25.897141257, -33.027821748), (-2.799065676, -33.027821748))
            ThreePointArc((-2.799065676, -33.027821748), (7.200934324, -23.027821748), (-2.799065676, -13.027821748))
            Line((-2.799065676, -13.027821748), (-25.897141257, -13.027821748))
            ThreePointArc((-25.897141257, -13.027821748), (-35.897141257, -23.027821748), (-25.897141257, -33.027821748))
        make_face()
        with BuildLine():
            Line((-122.237776037, 72.496877719), (-145.335851618, 72.496877719))
            ThreePointArc((-145.335851618, 72.496877719), (-155.335851618, 62.496877719), (-145.335851618, 52.496877719))
            Line((-145.335851618, 52.496877719), (-122.237776037, 52.496877719))
            ThreePointArc((-122.237776037, 52.496877719), (-112.237776037, 62.496877719), (-122.237776037, 72.496877719))
        make_face()
        with BuildLine():
            Line((-122.237776037, -33.027821748), (-145.335851618, -33.027821748))
            ThreePointArc((-145.335851618, -33.027821748), (-155.335851618, -23.027821748), (-145.335851618, -13.027821748))
            Line((-145.335851618, -13.027821748), (-122.237776037, -13.027821748))
            ThreePointArc((-122.237776037, -13.027821748), (-112.237776037, -23.027821748), (-122.237776037, -33.027821748))
        make_face()
        with Locations((-103.171875577, 23.980610114)):
            Rectangle(SKETCH5_W, SKETCH5_H)
        with Locations((-40.967251396, 23.980610114)):
            Rectangle(SKETCH5_W, SKETCH5_H)
    extrude(amount=-CUT_EXTRUDE4_DEPTH, mode=Mode.SUBTRACT)

    # Sketch6 → Boss-Extrude2 (add)
    with BuildSketch(Plane(origin=(2, 0, 0), x_dir=(0, 0, -1), z_dir=(1, 0, 0))):
        with Locations((-73.162232803, 84.319953677)):
            Rectangle(SKETCH6_W, SKETCH6_H)
        with Locations((-73.162232803, -38.682270845)):
            Rectangle(SKETCH6_W, SKETCH6_H)
    extrude(amount=-BOSS_EXTRUDE2_DEPTH)

    # Fillet2
    fillet2_edges = [part.edges().sort_by_distance(p)[0] for p in [
        (1, 87.289241786, 45.662232803),
        (1, 87.289241786, 100.662232803),
        (1, -43.805312296, 100.662232803),
        (1, -43.805312296, 45.662232803),
    ]]
    fillet(fillet2_edges, radius=FILLET2_R)

    # Fillet3
    fillet3_edges = [part.edges().sort_by_distance(p)[0] for p in [
        (1, 111.548378948, 45.662232803),
        (1, 111.548378948, 100.662232803),
        (1, -65.910696116, 100.662232803),
        (1, -65.910696116, 45.662232803),
    ]]
    fillet(fillet3_edges, radius=FILLET3_R)

    # Sketch7 → Cut-Extrude5 (cut)
    with BuildSketch(Plane(origin=(2, 0, 0), x_dir=(0, 0, -1), z_dir=(1, 0, 0))):
        with Locations((-73.016623219, 100.664626398)):
            Circle(SKETCH7_R)
        with Locations((-73.016623219, -52.991297145)):
            Circle(SKETCH7_R)
    extrude(amount=-CUT_EXTRUDE5_DEPTH, mode=Mode.SUBTRACT)

    # Sketch8 → Cut-Extrude6 (cut)
    with BuildSketch(Plane(origin=(2, 0, 0), x_dir=(0, 0, -1), z_dir=(1, 0, 0))):
        with Locations((-73.162232803, 87.980610114)):
            Circle(SKETCH8_R)
        with Locations((-73.130017381, -43.925193935)):
            Circle(SKETCH8_R)
        with Locations((-73.130017382, 57.868901323)):
            Rectangle(SKETCH8_W, SKETCH8_H)
        with Locations((-73.130017381, -10.200651785)):
            Rectangle(SKETCH8_W_2, SKETCH8_H)
    extrude(amount=-CUT_EXTRUDE6_DEPTH, mode=Mode.SUBTRACT)

    # Fillet4
    # the kernel refuses this fillet: 3 mm, written as the material it adds along each edge
    with BuildSketch(Plane(origin=(2, 46.480610114, 42.967251396), x_dir=(0, 0, -1), z_dir=(-1, 0, 0)), Plane(origin=(2, 1.480610114, 42.967251396), x_dir=(0, 1, 0), z_dir=(-1, 0, 0)), Plane(origin=(2, 1.480610114, 101.171875577), x_dir=(0, 0, 1), z_dir=(-1, 0, 0)), Plane(origin=(2, 1.480610114, 105.171875577), x_dir=(0, 1, 0), z_dir=(-1, 0, 0)), Plane(origin=(2, 55.868901323, 98.788668866), x_dir=(0, 1, 0), z_dir=(-1, 0, 0)), Plane(origin=(2, 59.868901323, 47.471365897), x_dir=(0, -1, 0), z_dir=(-1, 0, 0)), Plane(origin=(2, 55.868901323, 47.471365897), x_dir=(0, 0, 1), z_dir=(-1, 0, 0)), Plane(origin=(2, -12.200651785, 46.261063235), x_dir=(0, 0, 1), z_dir=(-1, 0, 0)), Plane(origin=(2, -8.200651785, 46.261063235), x_dir=(0, -1, 0), z_dir=(-1, 0, 0)), Plane(origin=(2, -12.200651785, 99.998971527), x_dir=(0, 1, 0), z_dir=(-1, 0, 0))) as fillet4_piece_1:
        with BuildLine():
            CenterArc((FILLET4_R, FILLET4_R), FILLET4_R, 180, 90)
            Line((0, FILLET4_R), (0, 0))
            Line((0, 0), (FILLET4_R, 0))
        make_face()
    extrude(amount=2)
    with BuildSketch(Plane(origin=(2, 46.480610114, 38.967251396), x_dir=(0, 0, 1), z_dir=(-1, 0, 0)), Plane(origin=(2, 1.480610114, 38.967251396), x_dir=(0, 1, 0), z_dir=(-1, 0, 0)), Plane(origin=(2, 46.480610114, 101.171875577), x_dir=(0, 0, 1), z_dir=(-1, 0, 0)), Plane(origin=(2, 46.480610114, 105.171875577), x_dir=(0, -1, 0), z_dir=(-1, 0, 0)), Plane(origin=(2, 59.868901323, 98.788668866), x_dir=(0, -1, 0), z_dir=(-1, 0, 0)), Plane(origin=(2, -8.200651785, 99.998971527), x_dir=(0, -1, 0), z_dir=(-1, 0, 0))) as fillet4_piece_2:
        with BuildLine():
            CenterArc((FILLET4_R, -FILLET4_R), FILLET4_R, 90, 90)
            Line((0, -FILLET4_R), (0, 0))
            Line((0, 0), (FILLET4_R, 0))
        make_face()
    extrude(amount=2)


solid = part.part
